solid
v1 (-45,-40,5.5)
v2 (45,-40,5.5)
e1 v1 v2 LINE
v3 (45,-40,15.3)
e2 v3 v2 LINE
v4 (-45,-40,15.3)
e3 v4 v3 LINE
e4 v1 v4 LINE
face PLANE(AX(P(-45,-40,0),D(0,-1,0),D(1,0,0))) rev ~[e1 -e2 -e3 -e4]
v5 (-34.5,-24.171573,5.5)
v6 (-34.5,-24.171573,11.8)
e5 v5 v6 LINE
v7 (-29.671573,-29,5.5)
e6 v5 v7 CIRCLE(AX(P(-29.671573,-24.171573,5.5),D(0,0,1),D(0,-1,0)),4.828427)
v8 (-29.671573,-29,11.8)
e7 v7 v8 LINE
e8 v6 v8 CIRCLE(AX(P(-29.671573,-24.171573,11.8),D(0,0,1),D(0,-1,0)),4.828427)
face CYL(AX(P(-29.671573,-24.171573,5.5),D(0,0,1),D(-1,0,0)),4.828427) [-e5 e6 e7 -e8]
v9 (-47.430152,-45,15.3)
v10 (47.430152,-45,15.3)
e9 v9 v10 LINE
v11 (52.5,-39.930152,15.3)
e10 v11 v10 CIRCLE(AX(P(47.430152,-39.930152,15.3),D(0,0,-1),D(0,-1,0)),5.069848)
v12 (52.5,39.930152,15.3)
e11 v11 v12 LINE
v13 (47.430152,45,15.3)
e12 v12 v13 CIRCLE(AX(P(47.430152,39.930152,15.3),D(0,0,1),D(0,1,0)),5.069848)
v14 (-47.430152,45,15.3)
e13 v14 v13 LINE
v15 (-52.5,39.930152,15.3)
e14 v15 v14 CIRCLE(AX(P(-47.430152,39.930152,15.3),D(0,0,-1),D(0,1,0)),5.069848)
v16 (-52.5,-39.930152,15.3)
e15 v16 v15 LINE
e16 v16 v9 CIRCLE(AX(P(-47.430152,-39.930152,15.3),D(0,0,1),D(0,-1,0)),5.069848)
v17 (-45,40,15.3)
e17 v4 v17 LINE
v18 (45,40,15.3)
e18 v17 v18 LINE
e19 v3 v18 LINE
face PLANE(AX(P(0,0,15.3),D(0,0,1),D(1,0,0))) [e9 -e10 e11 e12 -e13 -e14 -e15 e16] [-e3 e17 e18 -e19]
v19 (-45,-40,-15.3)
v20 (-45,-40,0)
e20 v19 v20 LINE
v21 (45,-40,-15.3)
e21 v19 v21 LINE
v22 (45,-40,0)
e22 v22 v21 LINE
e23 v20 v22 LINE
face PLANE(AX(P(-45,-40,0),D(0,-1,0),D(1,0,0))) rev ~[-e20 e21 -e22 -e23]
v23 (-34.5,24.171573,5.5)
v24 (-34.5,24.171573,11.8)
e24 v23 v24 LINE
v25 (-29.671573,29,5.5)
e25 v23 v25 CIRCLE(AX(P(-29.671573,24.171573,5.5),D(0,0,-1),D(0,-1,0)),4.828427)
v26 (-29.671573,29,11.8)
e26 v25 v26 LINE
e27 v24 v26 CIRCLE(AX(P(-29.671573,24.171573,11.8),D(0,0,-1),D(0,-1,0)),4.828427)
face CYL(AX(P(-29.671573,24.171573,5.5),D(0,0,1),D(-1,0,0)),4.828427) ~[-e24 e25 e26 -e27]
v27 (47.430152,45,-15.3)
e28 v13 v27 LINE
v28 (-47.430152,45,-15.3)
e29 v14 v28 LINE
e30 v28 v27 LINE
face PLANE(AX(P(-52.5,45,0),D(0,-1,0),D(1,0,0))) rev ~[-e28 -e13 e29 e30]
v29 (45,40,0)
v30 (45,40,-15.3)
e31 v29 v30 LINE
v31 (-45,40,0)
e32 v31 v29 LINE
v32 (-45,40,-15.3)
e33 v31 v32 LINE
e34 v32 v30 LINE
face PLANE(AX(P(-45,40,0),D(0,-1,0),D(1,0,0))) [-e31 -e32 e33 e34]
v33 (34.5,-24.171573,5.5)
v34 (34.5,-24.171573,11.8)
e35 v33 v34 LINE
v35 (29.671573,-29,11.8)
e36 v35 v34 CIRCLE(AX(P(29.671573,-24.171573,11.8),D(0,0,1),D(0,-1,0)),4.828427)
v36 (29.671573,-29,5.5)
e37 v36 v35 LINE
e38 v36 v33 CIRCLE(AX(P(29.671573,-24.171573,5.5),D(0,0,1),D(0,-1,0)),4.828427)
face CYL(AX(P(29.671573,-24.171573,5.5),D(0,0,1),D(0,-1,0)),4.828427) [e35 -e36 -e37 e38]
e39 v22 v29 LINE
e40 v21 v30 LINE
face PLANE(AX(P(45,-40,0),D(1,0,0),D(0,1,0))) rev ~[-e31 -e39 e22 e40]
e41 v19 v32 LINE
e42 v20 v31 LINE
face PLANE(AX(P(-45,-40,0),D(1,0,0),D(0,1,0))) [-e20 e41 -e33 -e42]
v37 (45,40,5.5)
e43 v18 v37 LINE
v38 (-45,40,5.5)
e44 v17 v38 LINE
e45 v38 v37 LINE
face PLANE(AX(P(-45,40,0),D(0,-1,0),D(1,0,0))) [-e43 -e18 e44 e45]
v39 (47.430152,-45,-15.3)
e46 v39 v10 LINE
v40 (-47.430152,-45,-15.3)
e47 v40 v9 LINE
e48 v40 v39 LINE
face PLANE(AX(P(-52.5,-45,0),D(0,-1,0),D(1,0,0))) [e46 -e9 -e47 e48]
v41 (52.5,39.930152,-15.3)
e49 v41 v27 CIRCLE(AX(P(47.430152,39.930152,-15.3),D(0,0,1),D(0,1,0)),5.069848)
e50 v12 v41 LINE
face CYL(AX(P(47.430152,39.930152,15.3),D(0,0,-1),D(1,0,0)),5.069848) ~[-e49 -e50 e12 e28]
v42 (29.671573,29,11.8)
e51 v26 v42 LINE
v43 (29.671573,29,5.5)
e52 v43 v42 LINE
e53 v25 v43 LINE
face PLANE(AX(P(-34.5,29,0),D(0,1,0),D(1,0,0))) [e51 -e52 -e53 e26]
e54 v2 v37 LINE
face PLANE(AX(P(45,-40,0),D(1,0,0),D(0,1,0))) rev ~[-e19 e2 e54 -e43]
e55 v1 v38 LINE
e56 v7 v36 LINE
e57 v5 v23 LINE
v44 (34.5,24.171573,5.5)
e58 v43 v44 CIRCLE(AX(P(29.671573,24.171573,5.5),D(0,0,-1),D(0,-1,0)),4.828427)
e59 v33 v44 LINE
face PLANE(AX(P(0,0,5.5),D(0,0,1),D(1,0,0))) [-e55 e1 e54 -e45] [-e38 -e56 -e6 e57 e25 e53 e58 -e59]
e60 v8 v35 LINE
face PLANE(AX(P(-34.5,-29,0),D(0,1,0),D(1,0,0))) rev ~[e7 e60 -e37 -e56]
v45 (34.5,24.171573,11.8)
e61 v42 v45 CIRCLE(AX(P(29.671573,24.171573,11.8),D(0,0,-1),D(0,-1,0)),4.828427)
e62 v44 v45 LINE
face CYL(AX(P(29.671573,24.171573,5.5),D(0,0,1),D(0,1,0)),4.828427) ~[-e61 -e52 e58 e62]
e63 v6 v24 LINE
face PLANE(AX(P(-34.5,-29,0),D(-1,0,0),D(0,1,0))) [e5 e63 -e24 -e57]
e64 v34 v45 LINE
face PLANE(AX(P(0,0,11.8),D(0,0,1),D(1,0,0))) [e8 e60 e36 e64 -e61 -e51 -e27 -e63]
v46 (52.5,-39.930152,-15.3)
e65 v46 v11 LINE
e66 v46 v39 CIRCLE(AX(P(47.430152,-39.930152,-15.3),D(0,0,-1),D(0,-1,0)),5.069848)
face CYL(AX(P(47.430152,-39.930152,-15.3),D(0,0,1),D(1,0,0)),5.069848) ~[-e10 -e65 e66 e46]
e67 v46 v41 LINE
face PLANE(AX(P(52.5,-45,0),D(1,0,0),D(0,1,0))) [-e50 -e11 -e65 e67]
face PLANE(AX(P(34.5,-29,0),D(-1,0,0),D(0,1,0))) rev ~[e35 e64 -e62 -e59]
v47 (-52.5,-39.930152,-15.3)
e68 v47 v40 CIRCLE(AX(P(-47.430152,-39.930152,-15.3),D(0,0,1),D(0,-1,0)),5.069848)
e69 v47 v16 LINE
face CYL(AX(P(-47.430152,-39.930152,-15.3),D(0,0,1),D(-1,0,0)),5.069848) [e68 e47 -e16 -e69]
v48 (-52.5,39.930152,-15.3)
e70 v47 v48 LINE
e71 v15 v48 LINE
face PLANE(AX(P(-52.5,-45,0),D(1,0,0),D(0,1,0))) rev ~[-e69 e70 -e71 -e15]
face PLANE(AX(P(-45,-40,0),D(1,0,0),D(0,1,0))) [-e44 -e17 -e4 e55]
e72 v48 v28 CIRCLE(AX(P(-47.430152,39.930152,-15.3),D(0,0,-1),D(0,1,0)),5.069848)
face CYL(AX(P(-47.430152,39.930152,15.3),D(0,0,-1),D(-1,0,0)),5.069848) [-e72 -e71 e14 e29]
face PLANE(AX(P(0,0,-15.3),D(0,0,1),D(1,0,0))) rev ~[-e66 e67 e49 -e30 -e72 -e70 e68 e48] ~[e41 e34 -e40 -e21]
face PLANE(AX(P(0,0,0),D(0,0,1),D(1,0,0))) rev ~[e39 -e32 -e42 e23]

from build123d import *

# Parameters (mm, degrees)
F0_W     = 105
F0_H     = 90
F0_W_2   = 90
F0_H_2   = 80
F1_DEPTH = 15.3
F2_R     = 5.069848481
F0_W_3   = 69
F0_H_3   = 58
F3_DEPTH = 5.5
F4_DEPTH = 11.8
F5_R     = 4.8284271247


with BuildPart() as f1:
    # F0 (on Top) → F1 (new body, symmetric)
    with BuildSketch(Plane.XY):
        Rectangle(F0_W, F0_H)
        Rectangle(F0_W_2, F0_H_2, mode=Mode.SUBTRACT)
    extrude(amount=F1_DEPTH, both=True)

    # F2
    f2_edges = [f1.edges().sort_by_distance(p)[0] for p in [
        (52.5, -45, 0),
        (-52.5, -45, 0),
        (-52.5, 45, 0),
        (52.5, 45, 0),
    ]]
    fillet(f2_edges, radius=F2_R)

    # F0 (on Top) → F3 (join)
    with BuildSketch(Plane.XY):
        Rectangle(F0_W_2, F0_H_2)
        Rectangle(F0_W_3, F0_H_3, mode=Mode.SUBTRACT)
    extrude(amount=F3_DEPTH)

    # F0 (on Top) → F4 (join)
    with BuildSketch(Plane.XY):
        Rectangle(F0_W_3, F0_H_3)
    extrude(amount=F4_DEPTH)

    # F5
    f5_edges = [f1.edges().sort_by_distance(p)[0] for p in [
        (34.5, -29, 8.65),
        (34.5, 29, 8.65),
        (-34.5, 29, 8.65),
        (-34.5, -29, 8.65),
    ]]
    fillet(f5_edges, radius=F5_R)


solid = f1.part
